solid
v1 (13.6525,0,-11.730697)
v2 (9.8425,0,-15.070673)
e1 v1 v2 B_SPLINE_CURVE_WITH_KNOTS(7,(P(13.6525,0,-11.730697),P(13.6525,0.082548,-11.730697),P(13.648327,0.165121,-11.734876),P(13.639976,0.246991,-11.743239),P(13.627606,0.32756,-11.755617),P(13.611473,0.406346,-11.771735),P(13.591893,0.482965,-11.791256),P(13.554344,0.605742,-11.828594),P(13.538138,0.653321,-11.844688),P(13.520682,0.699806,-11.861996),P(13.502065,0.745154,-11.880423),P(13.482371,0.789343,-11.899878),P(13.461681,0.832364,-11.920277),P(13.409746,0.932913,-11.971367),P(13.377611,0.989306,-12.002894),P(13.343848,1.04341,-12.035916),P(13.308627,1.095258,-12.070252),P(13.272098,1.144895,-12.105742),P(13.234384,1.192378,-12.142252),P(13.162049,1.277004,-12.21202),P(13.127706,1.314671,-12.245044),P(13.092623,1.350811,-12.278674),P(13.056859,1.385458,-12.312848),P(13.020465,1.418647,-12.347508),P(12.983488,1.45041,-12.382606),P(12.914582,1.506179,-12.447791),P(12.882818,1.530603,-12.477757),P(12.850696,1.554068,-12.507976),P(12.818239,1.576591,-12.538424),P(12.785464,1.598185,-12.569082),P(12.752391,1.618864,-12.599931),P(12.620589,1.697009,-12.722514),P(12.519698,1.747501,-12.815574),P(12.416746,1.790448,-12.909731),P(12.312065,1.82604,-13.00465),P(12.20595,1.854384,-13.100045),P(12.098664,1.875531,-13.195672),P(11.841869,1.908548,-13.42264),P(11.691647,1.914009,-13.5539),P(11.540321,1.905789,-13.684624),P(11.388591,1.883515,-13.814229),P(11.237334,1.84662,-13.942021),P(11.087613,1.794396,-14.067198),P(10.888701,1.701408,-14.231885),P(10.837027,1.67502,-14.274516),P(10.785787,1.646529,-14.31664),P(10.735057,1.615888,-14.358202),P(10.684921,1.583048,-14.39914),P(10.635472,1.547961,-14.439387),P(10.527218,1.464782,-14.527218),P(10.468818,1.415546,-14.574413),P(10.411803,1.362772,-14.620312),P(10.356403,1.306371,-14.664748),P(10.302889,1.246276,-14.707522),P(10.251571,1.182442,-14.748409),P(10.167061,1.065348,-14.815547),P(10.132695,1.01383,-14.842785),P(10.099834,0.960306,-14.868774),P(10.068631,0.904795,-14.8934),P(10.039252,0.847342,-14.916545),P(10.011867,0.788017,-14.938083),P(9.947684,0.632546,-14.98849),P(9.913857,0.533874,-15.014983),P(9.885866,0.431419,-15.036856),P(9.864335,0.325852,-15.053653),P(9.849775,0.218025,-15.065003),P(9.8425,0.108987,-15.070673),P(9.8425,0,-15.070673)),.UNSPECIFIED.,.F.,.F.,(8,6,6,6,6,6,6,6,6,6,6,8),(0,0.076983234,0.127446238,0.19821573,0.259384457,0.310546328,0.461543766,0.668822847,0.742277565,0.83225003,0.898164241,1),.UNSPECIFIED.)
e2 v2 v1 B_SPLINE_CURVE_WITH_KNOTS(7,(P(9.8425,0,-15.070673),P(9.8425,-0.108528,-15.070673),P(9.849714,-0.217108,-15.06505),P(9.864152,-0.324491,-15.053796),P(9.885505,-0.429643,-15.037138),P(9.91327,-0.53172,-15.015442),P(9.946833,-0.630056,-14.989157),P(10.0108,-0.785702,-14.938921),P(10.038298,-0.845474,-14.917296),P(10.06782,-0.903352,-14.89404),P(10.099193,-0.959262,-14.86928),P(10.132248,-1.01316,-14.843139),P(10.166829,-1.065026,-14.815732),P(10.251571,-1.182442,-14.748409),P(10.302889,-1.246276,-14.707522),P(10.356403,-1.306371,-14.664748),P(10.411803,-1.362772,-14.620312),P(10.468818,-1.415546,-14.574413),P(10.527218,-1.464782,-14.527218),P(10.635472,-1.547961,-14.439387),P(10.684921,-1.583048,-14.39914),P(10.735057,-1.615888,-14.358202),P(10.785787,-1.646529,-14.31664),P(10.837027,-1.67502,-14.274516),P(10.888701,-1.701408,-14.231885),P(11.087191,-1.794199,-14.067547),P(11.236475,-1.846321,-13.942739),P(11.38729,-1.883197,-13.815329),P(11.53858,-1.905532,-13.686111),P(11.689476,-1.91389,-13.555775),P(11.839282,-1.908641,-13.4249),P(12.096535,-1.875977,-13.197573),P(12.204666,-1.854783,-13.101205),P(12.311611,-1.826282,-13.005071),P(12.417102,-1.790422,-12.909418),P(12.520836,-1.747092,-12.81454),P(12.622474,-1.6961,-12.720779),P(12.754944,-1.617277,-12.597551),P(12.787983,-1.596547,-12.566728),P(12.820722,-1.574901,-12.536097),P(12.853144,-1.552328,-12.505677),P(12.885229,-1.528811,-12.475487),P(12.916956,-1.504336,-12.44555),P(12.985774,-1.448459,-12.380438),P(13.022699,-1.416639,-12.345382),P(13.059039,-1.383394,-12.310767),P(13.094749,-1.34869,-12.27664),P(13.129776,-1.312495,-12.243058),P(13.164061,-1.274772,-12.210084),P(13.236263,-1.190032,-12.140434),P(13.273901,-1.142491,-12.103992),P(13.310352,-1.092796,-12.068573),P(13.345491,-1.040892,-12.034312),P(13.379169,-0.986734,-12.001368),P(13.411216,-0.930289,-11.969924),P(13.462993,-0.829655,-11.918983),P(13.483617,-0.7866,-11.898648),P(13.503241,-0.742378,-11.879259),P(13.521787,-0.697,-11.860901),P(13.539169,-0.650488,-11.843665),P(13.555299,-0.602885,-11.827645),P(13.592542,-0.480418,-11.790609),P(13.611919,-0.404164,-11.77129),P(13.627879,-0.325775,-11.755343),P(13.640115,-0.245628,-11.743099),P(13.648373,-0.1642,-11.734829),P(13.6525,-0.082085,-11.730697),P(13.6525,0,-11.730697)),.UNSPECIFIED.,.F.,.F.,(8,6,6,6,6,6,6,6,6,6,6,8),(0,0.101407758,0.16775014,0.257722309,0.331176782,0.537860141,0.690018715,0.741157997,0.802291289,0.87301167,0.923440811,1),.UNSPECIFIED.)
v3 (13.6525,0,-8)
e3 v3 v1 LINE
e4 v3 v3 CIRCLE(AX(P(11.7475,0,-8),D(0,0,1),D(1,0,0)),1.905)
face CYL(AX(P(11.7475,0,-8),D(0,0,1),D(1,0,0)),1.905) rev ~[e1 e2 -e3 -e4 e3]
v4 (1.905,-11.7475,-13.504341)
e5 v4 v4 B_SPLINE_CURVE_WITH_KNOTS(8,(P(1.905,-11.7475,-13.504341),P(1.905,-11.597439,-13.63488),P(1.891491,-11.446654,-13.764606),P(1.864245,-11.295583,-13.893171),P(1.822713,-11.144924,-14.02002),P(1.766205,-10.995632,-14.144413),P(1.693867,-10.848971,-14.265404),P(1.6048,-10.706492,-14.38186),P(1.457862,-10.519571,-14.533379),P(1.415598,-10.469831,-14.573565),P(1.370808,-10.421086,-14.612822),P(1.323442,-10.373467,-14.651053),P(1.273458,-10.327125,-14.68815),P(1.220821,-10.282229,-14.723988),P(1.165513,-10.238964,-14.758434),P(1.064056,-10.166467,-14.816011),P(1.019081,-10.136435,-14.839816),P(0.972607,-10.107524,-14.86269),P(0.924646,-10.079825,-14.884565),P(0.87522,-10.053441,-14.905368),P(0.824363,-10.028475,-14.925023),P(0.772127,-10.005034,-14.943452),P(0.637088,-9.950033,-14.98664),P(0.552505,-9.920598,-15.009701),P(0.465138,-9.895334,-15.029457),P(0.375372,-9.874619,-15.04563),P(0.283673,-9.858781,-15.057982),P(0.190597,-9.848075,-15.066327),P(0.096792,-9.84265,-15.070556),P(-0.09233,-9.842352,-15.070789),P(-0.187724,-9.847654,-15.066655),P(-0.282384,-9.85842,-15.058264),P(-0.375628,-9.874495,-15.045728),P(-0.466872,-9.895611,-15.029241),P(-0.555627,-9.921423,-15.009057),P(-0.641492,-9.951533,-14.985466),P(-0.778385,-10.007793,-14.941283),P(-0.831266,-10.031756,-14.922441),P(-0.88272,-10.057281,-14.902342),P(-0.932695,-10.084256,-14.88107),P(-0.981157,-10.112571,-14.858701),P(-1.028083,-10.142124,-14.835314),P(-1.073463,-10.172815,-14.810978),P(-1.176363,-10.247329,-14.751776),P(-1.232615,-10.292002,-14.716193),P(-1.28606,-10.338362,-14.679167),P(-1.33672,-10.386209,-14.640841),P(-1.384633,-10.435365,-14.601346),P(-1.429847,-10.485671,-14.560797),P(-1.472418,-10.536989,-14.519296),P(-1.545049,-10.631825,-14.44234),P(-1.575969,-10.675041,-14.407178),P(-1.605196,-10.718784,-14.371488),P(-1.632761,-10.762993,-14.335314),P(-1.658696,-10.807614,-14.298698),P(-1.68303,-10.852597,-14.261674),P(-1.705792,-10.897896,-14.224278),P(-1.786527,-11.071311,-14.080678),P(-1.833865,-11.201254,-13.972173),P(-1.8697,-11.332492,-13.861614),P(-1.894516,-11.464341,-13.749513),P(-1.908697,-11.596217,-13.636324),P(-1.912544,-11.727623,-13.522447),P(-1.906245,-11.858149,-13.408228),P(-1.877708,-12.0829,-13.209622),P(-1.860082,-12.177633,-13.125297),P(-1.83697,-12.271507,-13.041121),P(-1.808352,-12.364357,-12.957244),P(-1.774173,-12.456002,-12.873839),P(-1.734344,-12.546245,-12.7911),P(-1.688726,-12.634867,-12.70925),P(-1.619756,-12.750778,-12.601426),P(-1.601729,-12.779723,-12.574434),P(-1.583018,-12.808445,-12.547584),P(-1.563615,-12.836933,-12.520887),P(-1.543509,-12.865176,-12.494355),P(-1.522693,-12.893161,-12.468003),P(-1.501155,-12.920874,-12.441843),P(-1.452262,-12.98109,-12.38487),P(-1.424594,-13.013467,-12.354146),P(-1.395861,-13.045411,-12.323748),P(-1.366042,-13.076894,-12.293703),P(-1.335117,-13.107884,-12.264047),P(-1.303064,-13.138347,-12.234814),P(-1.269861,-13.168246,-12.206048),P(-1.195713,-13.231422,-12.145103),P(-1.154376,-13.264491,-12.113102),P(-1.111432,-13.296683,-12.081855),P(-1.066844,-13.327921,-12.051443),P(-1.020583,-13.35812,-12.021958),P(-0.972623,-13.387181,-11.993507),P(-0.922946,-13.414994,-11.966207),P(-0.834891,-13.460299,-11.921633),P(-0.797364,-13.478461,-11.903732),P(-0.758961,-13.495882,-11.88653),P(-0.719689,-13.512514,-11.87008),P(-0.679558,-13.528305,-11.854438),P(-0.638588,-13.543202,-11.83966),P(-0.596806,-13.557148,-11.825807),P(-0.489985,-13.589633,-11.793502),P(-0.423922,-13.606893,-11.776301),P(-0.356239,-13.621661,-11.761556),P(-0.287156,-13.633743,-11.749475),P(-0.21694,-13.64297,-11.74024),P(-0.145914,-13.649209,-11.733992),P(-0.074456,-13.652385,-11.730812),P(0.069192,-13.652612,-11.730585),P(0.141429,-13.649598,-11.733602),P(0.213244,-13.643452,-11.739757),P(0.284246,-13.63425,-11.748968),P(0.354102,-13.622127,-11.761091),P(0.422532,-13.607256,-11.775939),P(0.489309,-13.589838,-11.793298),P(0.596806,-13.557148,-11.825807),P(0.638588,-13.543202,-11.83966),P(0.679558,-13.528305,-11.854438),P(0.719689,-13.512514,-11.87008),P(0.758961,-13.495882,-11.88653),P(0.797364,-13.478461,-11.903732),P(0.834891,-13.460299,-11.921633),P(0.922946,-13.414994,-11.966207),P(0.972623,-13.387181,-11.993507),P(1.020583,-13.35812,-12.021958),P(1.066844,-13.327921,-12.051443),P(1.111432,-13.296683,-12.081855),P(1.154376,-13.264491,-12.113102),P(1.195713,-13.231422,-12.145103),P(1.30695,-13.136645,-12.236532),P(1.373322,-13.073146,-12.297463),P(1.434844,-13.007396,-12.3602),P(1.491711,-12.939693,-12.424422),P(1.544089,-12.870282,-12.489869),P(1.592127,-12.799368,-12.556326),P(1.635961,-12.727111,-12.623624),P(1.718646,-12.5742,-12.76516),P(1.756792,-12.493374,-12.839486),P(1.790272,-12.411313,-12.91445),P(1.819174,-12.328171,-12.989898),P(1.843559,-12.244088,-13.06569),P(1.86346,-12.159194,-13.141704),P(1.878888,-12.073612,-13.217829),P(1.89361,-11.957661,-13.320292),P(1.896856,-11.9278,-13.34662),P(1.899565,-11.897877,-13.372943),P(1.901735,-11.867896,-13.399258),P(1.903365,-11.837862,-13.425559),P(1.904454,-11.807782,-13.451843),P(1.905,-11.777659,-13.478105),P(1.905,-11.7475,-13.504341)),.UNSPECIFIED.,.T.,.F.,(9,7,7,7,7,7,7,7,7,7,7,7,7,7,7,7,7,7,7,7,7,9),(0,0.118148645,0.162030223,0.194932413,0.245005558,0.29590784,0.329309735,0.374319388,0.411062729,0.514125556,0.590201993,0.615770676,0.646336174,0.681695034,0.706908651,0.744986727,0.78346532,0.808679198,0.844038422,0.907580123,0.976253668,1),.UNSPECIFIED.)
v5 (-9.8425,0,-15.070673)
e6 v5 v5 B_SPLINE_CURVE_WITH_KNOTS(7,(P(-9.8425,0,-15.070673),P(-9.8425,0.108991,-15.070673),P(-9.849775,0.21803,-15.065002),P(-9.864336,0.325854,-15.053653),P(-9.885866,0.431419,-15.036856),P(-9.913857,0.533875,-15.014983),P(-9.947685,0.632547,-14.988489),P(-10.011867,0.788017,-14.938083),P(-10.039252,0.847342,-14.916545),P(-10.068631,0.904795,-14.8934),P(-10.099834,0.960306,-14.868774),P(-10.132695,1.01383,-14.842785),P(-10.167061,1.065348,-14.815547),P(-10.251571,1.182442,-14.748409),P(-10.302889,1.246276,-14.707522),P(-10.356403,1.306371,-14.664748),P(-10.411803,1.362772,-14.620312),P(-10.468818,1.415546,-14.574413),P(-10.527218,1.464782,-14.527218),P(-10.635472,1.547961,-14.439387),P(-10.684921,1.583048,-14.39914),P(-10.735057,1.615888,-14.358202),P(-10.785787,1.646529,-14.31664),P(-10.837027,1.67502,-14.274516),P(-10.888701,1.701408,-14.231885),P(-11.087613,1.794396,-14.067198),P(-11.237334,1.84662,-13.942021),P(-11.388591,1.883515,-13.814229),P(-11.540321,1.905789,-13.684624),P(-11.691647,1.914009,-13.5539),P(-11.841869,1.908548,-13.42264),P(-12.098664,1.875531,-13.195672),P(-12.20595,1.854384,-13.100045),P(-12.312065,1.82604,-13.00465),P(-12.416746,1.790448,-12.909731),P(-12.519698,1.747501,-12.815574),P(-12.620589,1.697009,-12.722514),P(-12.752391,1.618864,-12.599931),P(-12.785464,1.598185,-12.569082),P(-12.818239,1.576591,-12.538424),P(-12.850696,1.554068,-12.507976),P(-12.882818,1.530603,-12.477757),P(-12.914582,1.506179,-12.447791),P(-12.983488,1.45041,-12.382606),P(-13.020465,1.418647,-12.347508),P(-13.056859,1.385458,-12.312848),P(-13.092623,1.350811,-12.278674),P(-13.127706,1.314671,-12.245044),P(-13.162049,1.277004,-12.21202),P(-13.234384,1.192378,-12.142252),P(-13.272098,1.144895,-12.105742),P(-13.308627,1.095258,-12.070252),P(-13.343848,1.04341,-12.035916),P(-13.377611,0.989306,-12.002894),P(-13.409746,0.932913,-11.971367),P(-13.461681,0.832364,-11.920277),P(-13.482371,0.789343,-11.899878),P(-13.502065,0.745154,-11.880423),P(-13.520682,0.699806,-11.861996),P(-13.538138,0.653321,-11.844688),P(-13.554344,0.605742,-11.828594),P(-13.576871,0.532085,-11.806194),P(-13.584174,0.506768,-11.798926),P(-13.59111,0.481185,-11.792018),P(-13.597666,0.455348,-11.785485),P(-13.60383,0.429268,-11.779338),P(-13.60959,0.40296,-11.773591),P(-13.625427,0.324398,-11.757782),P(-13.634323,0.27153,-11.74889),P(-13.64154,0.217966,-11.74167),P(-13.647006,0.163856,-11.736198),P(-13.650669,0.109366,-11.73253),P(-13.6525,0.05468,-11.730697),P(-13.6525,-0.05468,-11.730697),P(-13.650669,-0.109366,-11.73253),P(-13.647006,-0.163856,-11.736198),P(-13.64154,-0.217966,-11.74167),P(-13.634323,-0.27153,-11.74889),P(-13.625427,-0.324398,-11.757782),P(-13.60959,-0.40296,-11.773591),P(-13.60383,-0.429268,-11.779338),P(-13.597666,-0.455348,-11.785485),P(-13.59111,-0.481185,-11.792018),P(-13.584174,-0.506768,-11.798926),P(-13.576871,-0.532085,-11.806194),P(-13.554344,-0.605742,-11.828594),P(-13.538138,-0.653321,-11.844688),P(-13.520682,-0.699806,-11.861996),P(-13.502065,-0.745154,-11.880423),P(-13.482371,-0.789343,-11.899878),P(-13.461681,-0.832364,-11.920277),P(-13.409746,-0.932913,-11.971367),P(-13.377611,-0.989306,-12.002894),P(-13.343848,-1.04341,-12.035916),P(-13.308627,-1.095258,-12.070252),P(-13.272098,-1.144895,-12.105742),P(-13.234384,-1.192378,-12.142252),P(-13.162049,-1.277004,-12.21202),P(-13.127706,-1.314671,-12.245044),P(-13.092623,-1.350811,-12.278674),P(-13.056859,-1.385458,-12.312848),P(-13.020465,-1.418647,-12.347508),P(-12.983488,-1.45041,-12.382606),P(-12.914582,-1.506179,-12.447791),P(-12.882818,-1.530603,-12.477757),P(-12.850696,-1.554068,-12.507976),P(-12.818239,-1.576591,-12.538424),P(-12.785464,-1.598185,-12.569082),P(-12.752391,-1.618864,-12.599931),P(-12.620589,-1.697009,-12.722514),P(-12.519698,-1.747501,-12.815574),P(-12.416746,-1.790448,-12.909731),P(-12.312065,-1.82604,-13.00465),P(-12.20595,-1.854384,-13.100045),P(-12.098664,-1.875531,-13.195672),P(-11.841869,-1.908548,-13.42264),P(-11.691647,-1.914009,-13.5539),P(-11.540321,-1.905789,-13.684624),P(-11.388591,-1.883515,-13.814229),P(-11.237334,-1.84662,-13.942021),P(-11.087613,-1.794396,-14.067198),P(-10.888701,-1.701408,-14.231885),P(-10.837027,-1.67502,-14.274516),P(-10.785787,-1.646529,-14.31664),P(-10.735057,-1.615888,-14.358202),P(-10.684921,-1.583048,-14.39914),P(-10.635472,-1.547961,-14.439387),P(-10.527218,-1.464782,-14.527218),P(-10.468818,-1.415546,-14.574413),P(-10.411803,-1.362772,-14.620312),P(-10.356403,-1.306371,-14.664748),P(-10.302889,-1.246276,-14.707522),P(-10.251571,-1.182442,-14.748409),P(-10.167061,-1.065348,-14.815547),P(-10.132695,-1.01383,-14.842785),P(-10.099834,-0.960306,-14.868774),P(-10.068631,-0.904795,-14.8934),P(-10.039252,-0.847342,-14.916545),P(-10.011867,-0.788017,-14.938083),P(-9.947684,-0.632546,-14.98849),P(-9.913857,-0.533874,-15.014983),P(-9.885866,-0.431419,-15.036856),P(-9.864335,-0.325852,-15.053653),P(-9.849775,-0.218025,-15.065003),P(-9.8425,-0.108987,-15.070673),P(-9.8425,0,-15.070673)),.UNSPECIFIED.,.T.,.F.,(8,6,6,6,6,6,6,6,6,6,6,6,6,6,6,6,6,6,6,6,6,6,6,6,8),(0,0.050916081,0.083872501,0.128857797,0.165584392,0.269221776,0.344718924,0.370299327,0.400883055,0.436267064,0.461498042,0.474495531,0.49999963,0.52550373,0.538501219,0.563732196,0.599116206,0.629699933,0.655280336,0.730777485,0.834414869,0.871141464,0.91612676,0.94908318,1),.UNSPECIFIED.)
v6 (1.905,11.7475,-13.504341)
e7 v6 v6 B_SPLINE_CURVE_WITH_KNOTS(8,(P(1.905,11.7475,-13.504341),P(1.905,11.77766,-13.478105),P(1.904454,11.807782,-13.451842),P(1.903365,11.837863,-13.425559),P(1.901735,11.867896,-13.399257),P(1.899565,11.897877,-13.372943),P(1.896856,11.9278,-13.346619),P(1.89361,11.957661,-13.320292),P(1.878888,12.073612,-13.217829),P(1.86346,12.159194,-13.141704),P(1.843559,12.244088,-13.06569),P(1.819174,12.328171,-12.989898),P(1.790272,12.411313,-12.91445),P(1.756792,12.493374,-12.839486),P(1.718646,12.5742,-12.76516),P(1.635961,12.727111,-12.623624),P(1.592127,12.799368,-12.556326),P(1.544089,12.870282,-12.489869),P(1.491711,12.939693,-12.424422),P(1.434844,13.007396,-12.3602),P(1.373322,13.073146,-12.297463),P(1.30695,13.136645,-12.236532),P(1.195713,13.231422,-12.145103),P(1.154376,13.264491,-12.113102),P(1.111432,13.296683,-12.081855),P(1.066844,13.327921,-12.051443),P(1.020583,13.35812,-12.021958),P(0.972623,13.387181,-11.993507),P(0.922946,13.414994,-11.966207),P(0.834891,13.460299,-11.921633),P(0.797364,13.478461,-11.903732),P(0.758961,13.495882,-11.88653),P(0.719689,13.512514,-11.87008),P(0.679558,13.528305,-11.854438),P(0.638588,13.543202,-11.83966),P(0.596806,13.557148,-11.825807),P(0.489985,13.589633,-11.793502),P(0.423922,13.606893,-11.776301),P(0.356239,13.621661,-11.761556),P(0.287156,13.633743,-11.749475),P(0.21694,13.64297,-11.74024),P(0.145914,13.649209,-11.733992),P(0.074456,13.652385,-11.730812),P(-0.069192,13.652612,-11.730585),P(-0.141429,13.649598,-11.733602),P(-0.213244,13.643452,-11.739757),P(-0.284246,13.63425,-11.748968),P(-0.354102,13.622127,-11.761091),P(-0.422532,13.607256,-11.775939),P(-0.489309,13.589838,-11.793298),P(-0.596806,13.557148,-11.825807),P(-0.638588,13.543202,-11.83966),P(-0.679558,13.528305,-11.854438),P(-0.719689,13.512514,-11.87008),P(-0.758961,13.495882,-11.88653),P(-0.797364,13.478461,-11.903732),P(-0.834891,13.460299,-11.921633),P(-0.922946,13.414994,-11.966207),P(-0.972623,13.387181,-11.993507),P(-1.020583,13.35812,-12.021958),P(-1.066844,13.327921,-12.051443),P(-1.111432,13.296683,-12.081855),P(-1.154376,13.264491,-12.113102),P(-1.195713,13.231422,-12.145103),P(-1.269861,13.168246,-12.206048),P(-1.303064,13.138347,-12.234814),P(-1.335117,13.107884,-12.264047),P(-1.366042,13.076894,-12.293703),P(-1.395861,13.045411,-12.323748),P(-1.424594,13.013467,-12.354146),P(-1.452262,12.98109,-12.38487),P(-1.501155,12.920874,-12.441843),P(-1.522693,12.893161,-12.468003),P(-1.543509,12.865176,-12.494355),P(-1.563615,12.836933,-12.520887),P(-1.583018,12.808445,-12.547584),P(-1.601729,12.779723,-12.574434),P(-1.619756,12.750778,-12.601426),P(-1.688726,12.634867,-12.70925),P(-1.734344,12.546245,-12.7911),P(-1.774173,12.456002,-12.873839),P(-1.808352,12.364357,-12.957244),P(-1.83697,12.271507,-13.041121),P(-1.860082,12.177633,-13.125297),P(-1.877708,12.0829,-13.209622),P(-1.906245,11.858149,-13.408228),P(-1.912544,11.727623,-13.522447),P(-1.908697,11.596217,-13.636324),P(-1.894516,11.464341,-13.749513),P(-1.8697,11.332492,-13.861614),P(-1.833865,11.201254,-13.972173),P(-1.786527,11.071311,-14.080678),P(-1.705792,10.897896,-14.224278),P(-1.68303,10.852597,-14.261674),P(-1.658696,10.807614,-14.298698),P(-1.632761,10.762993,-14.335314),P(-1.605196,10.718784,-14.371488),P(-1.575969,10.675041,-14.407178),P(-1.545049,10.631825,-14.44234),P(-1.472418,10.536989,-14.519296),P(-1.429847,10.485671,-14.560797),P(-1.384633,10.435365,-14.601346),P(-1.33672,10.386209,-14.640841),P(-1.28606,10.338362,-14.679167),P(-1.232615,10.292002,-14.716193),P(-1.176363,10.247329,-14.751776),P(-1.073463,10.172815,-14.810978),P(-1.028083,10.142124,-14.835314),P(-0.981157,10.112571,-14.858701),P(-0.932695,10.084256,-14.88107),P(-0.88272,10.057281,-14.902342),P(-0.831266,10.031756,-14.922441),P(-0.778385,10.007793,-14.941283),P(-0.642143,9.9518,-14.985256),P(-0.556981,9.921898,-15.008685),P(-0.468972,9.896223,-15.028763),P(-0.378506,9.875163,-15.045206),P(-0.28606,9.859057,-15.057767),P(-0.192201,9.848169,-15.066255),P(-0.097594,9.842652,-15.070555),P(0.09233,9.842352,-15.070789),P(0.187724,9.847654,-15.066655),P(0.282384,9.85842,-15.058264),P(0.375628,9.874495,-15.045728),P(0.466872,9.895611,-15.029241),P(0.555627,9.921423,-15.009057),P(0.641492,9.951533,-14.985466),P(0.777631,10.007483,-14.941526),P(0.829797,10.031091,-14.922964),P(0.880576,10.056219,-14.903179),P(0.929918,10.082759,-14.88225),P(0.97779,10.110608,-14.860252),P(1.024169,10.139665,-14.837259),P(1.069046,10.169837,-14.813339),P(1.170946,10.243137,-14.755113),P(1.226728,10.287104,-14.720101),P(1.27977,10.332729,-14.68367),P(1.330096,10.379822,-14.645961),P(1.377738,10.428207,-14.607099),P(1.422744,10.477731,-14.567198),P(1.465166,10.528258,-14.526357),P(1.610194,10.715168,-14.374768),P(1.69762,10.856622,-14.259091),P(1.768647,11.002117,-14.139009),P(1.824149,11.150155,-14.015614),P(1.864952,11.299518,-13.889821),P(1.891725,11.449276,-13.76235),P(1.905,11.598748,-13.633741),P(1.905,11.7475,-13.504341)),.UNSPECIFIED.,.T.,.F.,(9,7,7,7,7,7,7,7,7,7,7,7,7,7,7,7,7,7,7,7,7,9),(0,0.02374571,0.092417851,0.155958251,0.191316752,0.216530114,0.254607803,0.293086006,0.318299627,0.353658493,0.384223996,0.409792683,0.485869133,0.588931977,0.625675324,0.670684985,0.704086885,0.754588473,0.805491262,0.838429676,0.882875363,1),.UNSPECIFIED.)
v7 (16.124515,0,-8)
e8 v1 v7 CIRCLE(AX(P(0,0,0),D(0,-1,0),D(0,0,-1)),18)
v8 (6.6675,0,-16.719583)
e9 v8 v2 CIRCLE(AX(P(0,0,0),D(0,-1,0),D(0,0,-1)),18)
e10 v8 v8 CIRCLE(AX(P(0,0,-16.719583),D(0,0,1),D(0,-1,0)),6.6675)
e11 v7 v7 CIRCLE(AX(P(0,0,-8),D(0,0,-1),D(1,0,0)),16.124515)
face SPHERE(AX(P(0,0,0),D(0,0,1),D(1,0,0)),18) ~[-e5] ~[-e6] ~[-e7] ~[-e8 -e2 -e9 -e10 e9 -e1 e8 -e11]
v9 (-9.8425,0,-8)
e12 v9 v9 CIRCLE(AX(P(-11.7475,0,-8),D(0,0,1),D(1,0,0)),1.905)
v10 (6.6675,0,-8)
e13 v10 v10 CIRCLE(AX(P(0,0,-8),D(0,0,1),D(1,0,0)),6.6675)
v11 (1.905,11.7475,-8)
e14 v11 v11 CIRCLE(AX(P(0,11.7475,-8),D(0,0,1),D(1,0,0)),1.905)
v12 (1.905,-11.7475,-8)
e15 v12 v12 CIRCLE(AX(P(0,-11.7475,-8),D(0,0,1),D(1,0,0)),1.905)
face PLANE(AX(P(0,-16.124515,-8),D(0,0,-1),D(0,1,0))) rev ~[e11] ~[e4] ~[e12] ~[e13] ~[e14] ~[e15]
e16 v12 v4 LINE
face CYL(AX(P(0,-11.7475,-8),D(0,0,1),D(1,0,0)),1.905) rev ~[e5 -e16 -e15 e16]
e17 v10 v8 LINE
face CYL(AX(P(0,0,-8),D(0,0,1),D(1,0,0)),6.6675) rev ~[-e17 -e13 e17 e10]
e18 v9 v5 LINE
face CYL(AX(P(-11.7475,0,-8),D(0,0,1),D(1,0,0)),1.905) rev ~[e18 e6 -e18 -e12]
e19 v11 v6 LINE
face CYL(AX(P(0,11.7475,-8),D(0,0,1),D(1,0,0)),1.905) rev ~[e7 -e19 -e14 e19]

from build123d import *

# Parameters (mm, degrees)
F3_DEPTH = 18
F4_R     = 1.905
F4_R_2   = 6.6675
F5_DEPTH = 10.001


# Not quite as in the source:
# - a feature names something its author has since deleted; it is built from what else it names


with BuildPart() as f1:
    # F0 (on Front) → F1 (revolve)
    with BuildSketch(Plane.XZ):
        with BuildLine():
            Line((0, 18), (0, -18))
            ThreePointArc((0, -18), (18, 0), (0, 18))
        make_face()
    revolve(axis=Axis((0, 0, 0), (0, 0, -1)))

    # F2 (on Right) → F3 (cut, symmetric)
    with BuildSketch(Plane.YZ):
        with BuildLine():
            Line((-16.1245154966, -8), (16.1245154966, -8))
            ThreePointArc((16.1245154966, -8), (0, 18), (-16.1245154966, -8))
        make_face()
    extrude(amount=F3_DEPTH, both=True, mode=Mode.SUBTRACT)

    # F4 (on face) → F5 (cut, through all)
    with BuildSketch(Plane.XY.offset(-8)):
        with Locations((0, -11.7475)):
            Circle(F4_R)
        with Locations((11.7475, 0)):
            Circle(F4_R)
        with Locations((0, 11.7475)):
            Circle(F4_R)
        with Locations((-11.7475, 0)):
            Circle(F4_R)
        Circle(F4_R_2)
    extrude(amount=-F5_DEPTH, mode=Mode.SUBTRACT)


solid = f1.part
